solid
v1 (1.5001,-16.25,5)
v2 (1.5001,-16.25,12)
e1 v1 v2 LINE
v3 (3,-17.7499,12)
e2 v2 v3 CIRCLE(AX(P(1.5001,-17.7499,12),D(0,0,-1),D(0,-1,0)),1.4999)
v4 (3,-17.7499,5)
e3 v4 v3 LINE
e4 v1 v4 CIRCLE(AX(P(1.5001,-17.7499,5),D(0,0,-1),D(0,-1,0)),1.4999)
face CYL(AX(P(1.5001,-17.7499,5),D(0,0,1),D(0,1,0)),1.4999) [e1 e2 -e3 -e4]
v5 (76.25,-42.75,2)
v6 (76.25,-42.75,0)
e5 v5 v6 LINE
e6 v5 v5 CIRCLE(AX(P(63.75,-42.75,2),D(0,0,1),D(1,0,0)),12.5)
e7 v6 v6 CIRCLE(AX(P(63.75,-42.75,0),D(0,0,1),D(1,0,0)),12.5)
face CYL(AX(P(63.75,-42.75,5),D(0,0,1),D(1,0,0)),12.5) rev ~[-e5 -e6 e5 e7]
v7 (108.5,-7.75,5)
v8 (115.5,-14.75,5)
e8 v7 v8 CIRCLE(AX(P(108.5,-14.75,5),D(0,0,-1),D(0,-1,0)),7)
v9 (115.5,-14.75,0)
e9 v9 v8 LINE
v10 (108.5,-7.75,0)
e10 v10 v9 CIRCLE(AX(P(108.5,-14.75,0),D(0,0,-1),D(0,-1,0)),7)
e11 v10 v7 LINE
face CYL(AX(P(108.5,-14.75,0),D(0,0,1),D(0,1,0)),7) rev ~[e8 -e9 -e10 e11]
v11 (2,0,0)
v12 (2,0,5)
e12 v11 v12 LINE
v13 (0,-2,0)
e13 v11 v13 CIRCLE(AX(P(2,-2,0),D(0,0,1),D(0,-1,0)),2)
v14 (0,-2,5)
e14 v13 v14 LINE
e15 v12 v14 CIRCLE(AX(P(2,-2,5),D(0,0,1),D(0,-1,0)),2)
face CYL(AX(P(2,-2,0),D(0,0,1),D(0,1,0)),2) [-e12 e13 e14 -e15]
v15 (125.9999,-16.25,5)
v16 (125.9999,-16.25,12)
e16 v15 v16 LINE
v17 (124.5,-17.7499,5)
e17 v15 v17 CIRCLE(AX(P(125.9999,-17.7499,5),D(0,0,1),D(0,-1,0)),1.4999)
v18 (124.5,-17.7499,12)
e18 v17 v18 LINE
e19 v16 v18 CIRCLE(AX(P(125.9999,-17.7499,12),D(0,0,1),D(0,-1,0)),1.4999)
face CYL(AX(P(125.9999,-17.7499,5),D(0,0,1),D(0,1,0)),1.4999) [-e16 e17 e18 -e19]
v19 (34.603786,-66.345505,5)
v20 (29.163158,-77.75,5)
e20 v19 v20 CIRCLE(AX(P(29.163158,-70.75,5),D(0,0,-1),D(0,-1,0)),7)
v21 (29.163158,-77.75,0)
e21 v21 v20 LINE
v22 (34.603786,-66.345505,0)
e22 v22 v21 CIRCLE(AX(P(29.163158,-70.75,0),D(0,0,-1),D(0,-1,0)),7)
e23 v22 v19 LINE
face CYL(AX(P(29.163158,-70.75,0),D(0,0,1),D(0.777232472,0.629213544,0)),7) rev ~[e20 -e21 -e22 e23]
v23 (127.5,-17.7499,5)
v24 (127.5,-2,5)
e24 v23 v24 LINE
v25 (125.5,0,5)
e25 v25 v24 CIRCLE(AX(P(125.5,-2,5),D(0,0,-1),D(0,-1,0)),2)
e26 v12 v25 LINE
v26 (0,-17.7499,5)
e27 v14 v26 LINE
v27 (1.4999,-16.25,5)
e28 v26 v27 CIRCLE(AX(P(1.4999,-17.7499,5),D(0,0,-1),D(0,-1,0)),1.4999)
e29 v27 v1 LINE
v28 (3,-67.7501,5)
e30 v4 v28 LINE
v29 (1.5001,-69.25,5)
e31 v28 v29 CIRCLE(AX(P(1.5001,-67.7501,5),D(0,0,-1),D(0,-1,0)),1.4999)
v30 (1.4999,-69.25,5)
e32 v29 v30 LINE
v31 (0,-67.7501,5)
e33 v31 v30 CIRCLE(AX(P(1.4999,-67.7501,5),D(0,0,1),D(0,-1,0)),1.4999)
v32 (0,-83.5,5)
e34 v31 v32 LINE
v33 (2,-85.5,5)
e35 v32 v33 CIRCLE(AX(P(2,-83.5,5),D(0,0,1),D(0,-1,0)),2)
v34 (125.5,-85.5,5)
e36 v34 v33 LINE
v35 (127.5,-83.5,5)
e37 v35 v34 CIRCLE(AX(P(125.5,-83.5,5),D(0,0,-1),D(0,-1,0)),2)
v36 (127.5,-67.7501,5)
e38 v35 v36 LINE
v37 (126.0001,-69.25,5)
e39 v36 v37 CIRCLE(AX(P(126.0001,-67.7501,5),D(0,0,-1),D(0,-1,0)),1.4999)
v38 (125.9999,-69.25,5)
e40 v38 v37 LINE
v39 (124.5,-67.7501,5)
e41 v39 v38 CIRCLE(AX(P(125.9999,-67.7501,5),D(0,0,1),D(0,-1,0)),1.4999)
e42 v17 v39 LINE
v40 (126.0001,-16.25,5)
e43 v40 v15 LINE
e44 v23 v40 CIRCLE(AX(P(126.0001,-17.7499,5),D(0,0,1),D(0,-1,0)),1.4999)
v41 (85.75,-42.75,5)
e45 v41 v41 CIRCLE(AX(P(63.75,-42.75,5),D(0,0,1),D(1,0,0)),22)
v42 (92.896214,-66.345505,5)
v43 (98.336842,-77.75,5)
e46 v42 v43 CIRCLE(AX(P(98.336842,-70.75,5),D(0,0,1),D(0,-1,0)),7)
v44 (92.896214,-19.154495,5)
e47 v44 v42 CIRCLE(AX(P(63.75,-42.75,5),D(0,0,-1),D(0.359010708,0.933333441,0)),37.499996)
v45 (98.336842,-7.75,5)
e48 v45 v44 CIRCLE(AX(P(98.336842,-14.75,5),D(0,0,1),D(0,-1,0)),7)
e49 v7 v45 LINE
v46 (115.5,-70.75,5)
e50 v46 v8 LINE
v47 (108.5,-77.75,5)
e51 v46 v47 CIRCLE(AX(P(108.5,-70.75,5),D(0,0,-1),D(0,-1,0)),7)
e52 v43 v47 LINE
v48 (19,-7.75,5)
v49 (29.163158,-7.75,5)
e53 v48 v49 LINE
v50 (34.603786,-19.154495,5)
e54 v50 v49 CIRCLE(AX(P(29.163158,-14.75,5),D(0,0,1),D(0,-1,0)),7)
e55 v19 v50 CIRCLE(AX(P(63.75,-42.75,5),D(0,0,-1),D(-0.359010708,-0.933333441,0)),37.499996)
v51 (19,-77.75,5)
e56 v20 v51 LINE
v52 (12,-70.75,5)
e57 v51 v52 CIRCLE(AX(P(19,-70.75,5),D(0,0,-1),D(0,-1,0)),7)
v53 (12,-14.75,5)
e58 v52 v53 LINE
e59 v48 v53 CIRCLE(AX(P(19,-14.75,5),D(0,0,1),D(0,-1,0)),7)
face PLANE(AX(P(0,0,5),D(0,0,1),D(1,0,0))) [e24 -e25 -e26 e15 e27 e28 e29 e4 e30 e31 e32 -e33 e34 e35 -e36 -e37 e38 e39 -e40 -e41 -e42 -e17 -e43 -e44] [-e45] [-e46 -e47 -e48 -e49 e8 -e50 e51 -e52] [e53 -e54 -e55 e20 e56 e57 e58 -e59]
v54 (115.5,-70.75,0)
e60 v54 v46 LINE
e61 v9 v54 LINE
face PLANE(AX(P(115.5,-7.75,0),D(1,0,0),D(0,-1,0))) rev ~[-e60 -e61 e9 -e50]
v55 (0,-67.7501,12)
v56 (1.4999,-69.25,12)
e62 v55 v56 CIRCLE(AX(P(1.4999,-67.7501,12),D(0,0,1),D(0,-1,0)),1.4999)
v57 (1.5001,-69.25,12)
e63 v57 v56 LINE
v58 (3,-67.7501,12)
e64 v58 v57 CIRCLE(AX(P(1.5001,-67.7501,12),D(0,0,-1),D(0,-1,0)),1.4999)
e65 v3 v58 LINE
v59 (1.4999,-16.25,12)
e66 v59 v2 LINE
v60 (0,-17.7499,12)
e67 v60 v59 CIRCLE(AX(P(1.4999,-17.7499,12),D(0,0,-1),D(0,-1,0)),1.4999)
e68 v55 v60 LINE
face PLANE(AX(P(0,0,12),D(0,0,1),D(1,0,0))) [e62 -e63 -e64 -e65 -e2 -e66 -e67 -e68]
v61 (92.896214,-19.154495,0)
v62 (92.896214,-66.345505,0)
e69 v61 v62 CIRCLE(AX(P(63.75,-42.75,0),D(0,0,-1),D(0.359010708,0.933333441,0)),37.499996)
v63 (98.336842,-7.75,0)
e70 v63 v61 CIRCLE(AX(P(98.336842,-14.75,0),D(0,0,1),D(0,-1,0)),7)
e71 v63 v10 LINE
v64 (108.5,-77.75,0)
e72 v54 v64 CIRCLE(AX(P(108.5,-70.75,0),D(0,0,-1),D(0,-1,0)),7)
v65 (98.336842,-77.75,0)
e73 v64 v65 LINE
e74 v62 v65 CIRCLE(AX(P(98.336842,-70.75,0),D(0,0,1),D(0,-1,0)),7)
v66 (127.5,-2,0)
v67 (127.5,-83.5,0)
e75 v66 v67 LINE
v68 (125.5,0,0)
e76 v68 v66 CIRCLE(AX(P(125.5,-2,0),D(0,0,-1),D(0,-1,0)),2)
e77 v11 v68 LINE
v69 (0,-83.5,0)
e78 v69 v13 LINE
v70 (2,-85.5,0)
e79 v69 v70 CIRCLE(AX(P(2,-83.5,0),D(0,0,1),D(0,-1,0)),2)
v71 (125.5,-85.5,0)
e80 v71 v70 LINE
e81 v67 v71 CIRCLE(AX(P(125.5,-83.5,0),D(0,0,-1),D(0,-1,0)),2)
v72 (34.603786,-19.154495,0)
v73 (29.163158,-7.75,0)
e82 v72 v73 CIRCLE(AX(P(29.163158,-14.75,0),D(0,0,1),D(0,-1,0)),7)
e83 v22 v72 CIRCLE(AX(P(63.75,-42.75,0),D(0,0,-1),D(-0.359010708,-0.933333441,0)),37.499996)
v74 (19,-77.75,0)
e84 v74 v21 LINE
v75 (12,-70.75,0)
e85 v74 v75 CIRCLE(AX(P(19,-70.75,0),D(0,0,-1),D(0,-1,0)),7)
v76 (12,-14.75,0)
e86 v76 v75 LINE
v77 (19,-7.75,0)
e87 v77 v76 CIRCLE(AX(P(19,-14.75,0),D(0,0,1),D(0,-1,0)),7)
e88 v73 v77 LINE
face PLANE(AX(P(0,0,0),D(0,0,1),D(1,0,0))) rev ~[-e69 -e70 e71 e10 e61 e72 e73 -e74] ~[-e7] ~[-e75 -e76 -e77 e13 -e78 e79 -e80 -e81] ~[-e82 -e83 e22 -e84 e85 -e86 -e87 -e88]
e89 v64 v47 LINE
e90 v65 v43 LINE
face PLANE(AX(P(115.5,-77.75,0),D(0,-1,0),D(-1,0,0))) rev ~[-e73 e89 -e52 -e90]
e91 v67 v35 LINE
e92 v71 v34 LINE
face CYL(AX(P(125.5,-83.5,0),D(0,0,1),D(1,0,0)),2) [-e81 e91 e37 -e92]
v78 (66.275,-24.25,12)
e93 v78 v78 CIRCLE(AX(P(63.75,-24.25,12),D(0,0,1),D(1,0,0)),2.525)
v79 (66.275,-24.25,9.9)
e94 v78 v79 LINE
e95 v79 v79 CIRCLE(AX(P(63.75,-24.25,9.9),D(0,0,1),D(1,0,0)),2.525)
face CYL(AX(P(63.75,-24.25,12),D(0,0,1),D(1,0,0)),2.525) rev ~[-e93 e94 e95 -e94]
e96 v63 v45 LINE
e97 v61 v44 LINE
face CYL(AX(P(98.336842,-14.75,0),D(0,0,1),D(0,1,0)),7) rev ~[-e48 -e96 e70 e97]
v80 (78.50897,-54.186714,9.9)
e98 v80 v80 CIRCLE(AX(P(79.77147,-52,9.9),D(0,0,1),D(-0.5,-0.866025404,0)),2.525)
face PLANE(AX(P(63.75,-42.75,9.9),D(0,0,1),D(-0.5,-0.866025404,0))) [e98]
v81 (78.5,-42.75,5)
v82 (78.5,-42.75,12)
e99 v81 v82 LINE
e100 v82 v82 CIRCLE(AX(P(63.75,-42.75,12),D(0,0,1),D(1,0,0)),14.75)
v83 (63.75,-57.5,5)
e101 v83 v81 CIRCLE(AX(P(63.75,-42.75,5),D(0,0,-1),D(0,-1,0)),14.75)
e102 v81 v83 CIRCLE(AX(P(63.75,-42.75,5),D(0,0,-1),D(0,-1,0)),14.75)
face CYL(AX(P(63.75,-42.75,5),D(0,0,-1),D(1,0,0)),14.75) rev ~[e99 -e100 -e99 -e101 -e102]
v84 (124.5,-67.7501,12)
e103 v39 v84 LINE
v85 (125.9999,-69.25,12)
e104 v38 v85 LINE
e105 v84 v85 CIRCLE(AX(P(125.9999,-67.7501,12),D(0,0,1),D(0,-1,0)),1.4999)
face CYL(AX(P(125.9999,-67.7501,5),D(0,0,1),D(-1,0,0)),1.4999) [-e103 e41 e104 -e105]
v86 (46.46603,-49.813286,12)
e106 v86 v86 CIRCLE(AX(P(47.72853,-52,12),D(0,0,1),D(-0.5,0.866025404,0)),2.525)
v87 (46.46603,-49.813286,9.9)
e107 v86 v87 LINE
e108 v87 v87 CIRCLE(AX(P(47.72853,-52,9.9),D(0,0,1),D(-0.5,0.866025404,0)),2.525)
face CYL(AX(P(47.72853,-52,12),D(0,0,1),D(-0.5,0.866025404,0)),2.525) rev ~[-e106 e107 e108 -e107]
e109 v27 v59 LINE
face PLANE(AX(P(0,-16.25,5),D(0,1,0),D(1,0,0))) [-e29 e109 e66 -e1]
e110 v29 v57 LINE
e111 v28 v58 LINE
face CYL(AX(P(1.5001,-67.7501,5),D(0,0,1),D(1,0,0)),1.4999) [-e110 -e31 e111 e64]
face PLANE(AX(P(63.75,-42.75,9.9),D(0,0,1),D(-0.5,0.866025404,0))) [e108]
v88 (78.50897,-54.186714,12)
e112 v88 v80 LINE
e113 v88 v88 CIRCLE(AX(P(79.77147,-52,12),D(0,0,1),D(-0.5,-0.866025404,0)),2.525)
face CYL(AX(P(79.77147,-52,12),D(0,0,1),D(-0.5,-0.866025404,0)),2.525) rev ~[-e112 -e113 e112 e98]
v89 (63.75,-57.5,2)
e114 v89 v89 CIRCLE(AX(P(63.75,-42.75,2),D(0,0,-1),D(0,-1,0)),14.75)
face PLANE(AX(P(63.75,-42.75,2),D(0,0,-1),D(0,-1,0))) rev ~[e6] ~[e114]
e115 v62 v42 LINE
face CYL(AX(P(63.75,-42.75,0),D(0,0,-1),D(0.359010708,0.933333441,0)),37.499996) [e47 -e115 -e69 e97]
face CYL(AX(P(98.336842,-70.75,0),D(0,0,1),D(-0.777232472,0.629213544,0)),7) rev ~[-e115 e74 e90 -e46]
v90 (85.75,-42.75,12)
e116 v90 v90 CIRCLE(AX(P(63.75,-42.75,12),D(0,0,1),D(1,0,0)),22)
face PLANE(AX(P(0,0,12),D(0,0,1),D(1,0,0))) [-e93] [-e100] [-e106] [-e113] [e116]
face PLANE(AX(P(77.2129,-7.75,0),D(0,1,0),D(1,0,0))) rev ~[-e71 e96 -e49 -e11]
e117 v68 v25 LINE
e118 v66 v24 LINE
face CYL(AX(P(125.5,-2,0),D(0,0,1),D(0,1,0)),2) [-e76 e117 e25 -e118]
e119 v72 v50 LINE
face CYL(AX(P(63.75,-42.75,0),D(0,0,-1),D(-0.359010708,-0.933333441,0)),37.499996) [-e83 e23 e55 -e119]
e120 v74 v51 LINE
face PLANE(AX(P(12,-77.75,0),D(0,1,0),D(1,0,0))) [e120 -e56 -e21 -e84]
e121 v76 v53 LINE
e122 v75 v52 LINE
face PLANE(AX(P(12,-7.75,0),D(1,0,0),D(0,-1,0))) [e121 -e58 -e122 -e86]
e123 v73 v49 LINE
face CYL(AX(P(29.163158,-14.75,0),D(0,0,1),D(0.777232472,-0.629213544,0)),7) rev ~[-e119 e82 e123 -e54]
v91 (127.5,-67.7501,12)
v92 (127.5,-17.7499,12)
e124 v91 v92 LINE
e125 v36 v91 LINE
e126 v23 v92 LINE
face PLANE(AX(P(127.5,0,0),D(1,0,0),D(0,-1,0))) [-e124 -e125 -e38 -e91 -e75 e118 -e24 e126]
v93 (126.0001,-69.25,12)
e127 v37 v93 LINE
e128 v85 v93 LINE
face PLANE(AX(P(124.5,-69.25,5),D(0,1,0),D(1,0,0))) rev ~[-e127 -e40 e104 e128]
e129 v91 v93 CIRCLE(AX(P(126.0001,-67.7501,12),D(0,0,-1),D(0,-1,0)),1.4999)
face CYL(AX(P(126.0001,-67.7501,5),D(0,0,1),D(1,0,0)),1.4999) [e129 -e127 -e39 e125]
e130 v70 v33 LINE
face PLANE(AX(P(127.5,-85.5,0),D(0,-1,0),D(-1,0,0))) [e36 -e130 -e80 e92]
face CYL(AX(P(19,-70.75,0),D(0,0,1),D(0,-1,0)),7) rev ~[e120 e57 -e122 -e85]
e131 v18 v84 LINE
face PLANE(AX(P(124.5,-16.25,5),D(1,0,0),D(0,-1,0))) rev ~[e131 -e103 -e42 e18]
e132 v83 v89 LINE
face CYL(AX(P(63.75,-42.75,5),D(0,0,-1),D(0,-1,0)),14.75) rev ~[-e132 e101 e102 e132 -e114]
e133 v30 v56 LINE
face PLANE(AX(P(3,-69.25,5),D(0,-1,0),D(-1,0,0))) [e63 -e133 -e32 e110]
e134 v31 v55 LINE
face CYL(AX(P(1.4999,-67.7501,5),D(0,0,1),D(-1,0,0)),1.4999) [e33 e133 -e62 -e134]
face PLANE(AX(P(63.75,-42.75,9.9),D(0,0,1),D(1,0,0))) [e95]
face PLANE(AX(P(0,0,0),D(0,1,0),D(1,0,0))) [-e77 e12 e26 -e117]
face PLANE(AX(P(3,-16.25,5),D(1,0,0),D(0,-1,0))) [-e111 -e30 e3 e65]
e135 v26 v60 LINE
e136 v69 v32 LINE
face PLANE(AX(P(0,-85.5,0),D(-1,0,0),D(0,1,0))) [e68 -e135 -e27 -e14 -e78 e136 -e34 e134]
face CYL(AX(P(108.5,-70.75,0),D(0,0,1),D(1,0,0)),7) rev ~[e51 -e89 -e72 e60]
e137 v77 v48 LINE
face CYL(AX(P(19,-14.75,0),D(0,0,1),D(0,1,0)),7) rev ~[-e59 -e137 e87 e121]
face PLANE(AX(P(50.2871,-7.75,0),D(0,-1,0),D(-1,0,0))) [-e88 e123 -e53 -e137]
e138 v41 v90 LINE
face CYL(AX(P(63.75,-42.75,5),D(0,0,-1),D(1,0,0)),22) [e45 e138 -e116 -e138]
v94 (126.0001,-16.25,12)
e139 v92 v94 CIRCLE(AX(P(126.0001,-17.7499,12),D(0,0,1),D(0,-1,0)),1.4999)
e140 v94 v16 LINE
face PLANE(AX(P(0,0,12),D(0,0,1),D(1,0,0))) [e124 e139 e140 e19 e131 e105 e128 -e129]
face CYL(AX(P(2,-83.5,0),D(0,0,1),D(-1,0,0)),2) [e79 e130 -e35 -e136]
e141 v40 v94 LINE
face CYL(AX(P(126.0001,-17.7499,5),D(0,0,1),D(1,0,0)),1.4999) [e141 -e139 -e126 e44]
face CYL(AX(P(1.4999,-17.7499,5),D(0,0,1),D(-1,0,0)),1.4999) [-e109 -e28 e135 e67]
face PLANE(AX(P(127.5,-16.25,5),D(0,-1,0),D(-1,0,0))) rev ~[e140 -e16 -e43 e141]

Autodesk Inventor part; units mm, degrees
ref_plane "YZ Plane" through (0, 0, 0) normal (1, 0, 0) x (0, 1, 0)
ref_plane "XZ Plane" through (0, 0, 0) normal (0, 1, 0) x (-1, 0, 0)
ref_plane "XY Plane" through (0, 0, 0) normal (0, 0, 1) x (1, 0, 0)
sketch "Skizze1" plane through (0, 0, 0) normal (0, 0, 1) x (1, 0, 0)
  line L0 (0, 0) -> (127.5, 0)
  line L1 (127.5, 0) -> (127.5, -85.5)
  line L2 (127.5, -85.5) -> (0, -85.5)
  line L3 (0, -85.5) -> (0, 0)
  dimension "d0" = 127.5
  dimension "d1" = 85.5
extrude "Extrusion1" add sketch "Skizze1" along normal blind 5
sketch "Skizze2" plane through (0, 0, 5) normal (0, 0, 1) x (1, 0, 0)
  line L0 (0, -16.25) -> (3, -16.25)
  line L1 (3, -16.25) -> (3, -69.25)
  line L2 (3, -69.25) -> (0, -69.25)
  line L3 (0, -69.25) -> (0, -16.25)
  line L4 (63.75, 42.9175) -> (63.75, -147.2432)
  line L5 (127.5, -85.5) -> (127.5, 0) projected
  line L6 (127.5, -16.25) -> (124.5, -16.25)
  line L7 (124.5, -16.25) -> (124.5, -69.25)
  line L8 (124.5, -69.25) -> (127.5, -69.25)
  line L9 (127.5, -69.25) -> (127.5, -16.25)
  point P0 (0, 0)
  dimension "d4" = 3
  dimension "d5" = 53
  dimension "d6" = 16.25
  dimension "d7" = 63.75
extrude "Extrusion2" add sketch "Skizze2" along normal blind 7
fillet "Rundung1" radius 2 4 edges at (0, 0, 2.5) (127.5, 0, 2.5) (127.5, -85.5, 2.5) (0, -85.5, 2.5)
fillet "Rundung2" radius 1.5 8 edges at (3, -69.25, 8.5) (0, -69.25, 8.5) (3, -16.25, 8.5) (0, -16.25, 8.5) (124.5, -16.25, 8.5) (127.5, -16.25, 8.5) (124.5, -69.25, 8.5) (127.5, -69.25, 8.5)
sketch "Skizze3" plane through (0, 0, 5) normal (0, 0, 1) x (1, 0, 0)
  circle A0 centre (63.75, -42.75) radius 12.5
  line L0 (0, -67.75) -> (0, -83.5) projected
  point P0 (0, 0)
  dimension "d12" = 25
  dimension "d13" = 63.75
  dimension "d14" = 42.75
extrude "Extrusion3" cut sketch "Skizze3" against normal blind 10
hole "Bohrung1" at (63.75, -42.75, 5) direction (0, 0, -1) diameter 29.5 depth 3
sketch "Skizze4" plane through (0, 0, 0) normal (0, 0, -1) x (-1, 0, 0)
  line L0 (-125.5, -85.5) -> (-2, -85.5) projected
  line L1 (0, -83.5) -> (0, -2) projected
  line L2 (-12, -77.75) -> (-50.2871, -77.75)
  line L3 (-50.2871, -7.75) -> (-12, -7.75)
  line L4 (-12, -7.75) -> (-12, -77.75)
  line L5 (-63.75, -42.75) -> (-63.75, -99.3052)
  line L6 (-115.5, -77.75) -> (-77.2129, -77.75)
  line L7 (-77.2129, -7.75) -> (-115.5, -7.75)
  line L8 (-115.5, -7.75) -> (-115.5, -77.75)
  arc A0 (-50.2871, -77.75) -> (-50.2871, -7.75) centre (-63.75, -42.75) ccw
  arc A1 (-77.2129, -7.75) -> (-77.2129, -77.75) centre (-63.75, -42.75) ccw
  arc A2 (-50.2871, -77.75) -> (-50.2871, -7.75) centre (-63.75, -42.75) ccw
  arc A3 (-77.2129, -7.75) -> (-77.2129, -77.75) centre (-63.75, -42.75) ccw
  point P0 (0, 0)
  dimension "d27" = 42.75
  dimension "d28" = 63.75
  dimension "d29" = 12
  dimension "d30" = 70
  dimension "d31" = 7.75
extrude "Extrusion4" cut sketch "Skizze4" against normal blind 10
fillet "Rundung3" radius 7 4 edges at (50.2871, -77.75, 2.5) (77.2129, -77.75, 2.5) (50.2871, -7.75, 2.5) (77.2129, -7.75, 2.5)
fillet "Rundung4" radius 7 4 edges at (12, -77.75, 2.5) (115.5, -77.75, 2.5) (12, -7.75, 2.5) (115.5, -7.75, 2.5)
sketch "Skizze5" plane through (0, 0, 5) normal (0, 0, 1) x (1, 0, 0)
  circle A0 centre (63.75, -42.75) radius 14.75
  circle A1 centre (63.75, -42.75) radius 22
  line L0 (125.5, 0) -> (2, 0) projected
  point P0 (0, 0)
  dimension "d36" = 29.5
  dimension "d37" = 44
  dimension "d38" = 42.75
  dimension "d39" = 63.75
extrude "Extrusion5" add sketch "Skizze5" along normal blind 7
sketch "Skizze6" plane through (63.75, -42.75, 12) normal (0, 0, 1) x (1, 0, 0)
  circle A0 centre (0, 18.5) radius 2.525
  circle A1 centre (0, 0) radius 12.5 projected
  point P0 (-63.75, 42.75)
  dimension "d42" = 5.05
  dimension "d43" = 18.5
extrude "Extrusion6" cut sketch "Skizze6" against normal blind 2.1 contours A0
pattern_circular "Runde Anordnung1" count 3 over 360 about axis through (63.75, -42.75, 5) along (0, 0, 1) of "Extrusion6"
properties part number "Sensor Halterung293"
